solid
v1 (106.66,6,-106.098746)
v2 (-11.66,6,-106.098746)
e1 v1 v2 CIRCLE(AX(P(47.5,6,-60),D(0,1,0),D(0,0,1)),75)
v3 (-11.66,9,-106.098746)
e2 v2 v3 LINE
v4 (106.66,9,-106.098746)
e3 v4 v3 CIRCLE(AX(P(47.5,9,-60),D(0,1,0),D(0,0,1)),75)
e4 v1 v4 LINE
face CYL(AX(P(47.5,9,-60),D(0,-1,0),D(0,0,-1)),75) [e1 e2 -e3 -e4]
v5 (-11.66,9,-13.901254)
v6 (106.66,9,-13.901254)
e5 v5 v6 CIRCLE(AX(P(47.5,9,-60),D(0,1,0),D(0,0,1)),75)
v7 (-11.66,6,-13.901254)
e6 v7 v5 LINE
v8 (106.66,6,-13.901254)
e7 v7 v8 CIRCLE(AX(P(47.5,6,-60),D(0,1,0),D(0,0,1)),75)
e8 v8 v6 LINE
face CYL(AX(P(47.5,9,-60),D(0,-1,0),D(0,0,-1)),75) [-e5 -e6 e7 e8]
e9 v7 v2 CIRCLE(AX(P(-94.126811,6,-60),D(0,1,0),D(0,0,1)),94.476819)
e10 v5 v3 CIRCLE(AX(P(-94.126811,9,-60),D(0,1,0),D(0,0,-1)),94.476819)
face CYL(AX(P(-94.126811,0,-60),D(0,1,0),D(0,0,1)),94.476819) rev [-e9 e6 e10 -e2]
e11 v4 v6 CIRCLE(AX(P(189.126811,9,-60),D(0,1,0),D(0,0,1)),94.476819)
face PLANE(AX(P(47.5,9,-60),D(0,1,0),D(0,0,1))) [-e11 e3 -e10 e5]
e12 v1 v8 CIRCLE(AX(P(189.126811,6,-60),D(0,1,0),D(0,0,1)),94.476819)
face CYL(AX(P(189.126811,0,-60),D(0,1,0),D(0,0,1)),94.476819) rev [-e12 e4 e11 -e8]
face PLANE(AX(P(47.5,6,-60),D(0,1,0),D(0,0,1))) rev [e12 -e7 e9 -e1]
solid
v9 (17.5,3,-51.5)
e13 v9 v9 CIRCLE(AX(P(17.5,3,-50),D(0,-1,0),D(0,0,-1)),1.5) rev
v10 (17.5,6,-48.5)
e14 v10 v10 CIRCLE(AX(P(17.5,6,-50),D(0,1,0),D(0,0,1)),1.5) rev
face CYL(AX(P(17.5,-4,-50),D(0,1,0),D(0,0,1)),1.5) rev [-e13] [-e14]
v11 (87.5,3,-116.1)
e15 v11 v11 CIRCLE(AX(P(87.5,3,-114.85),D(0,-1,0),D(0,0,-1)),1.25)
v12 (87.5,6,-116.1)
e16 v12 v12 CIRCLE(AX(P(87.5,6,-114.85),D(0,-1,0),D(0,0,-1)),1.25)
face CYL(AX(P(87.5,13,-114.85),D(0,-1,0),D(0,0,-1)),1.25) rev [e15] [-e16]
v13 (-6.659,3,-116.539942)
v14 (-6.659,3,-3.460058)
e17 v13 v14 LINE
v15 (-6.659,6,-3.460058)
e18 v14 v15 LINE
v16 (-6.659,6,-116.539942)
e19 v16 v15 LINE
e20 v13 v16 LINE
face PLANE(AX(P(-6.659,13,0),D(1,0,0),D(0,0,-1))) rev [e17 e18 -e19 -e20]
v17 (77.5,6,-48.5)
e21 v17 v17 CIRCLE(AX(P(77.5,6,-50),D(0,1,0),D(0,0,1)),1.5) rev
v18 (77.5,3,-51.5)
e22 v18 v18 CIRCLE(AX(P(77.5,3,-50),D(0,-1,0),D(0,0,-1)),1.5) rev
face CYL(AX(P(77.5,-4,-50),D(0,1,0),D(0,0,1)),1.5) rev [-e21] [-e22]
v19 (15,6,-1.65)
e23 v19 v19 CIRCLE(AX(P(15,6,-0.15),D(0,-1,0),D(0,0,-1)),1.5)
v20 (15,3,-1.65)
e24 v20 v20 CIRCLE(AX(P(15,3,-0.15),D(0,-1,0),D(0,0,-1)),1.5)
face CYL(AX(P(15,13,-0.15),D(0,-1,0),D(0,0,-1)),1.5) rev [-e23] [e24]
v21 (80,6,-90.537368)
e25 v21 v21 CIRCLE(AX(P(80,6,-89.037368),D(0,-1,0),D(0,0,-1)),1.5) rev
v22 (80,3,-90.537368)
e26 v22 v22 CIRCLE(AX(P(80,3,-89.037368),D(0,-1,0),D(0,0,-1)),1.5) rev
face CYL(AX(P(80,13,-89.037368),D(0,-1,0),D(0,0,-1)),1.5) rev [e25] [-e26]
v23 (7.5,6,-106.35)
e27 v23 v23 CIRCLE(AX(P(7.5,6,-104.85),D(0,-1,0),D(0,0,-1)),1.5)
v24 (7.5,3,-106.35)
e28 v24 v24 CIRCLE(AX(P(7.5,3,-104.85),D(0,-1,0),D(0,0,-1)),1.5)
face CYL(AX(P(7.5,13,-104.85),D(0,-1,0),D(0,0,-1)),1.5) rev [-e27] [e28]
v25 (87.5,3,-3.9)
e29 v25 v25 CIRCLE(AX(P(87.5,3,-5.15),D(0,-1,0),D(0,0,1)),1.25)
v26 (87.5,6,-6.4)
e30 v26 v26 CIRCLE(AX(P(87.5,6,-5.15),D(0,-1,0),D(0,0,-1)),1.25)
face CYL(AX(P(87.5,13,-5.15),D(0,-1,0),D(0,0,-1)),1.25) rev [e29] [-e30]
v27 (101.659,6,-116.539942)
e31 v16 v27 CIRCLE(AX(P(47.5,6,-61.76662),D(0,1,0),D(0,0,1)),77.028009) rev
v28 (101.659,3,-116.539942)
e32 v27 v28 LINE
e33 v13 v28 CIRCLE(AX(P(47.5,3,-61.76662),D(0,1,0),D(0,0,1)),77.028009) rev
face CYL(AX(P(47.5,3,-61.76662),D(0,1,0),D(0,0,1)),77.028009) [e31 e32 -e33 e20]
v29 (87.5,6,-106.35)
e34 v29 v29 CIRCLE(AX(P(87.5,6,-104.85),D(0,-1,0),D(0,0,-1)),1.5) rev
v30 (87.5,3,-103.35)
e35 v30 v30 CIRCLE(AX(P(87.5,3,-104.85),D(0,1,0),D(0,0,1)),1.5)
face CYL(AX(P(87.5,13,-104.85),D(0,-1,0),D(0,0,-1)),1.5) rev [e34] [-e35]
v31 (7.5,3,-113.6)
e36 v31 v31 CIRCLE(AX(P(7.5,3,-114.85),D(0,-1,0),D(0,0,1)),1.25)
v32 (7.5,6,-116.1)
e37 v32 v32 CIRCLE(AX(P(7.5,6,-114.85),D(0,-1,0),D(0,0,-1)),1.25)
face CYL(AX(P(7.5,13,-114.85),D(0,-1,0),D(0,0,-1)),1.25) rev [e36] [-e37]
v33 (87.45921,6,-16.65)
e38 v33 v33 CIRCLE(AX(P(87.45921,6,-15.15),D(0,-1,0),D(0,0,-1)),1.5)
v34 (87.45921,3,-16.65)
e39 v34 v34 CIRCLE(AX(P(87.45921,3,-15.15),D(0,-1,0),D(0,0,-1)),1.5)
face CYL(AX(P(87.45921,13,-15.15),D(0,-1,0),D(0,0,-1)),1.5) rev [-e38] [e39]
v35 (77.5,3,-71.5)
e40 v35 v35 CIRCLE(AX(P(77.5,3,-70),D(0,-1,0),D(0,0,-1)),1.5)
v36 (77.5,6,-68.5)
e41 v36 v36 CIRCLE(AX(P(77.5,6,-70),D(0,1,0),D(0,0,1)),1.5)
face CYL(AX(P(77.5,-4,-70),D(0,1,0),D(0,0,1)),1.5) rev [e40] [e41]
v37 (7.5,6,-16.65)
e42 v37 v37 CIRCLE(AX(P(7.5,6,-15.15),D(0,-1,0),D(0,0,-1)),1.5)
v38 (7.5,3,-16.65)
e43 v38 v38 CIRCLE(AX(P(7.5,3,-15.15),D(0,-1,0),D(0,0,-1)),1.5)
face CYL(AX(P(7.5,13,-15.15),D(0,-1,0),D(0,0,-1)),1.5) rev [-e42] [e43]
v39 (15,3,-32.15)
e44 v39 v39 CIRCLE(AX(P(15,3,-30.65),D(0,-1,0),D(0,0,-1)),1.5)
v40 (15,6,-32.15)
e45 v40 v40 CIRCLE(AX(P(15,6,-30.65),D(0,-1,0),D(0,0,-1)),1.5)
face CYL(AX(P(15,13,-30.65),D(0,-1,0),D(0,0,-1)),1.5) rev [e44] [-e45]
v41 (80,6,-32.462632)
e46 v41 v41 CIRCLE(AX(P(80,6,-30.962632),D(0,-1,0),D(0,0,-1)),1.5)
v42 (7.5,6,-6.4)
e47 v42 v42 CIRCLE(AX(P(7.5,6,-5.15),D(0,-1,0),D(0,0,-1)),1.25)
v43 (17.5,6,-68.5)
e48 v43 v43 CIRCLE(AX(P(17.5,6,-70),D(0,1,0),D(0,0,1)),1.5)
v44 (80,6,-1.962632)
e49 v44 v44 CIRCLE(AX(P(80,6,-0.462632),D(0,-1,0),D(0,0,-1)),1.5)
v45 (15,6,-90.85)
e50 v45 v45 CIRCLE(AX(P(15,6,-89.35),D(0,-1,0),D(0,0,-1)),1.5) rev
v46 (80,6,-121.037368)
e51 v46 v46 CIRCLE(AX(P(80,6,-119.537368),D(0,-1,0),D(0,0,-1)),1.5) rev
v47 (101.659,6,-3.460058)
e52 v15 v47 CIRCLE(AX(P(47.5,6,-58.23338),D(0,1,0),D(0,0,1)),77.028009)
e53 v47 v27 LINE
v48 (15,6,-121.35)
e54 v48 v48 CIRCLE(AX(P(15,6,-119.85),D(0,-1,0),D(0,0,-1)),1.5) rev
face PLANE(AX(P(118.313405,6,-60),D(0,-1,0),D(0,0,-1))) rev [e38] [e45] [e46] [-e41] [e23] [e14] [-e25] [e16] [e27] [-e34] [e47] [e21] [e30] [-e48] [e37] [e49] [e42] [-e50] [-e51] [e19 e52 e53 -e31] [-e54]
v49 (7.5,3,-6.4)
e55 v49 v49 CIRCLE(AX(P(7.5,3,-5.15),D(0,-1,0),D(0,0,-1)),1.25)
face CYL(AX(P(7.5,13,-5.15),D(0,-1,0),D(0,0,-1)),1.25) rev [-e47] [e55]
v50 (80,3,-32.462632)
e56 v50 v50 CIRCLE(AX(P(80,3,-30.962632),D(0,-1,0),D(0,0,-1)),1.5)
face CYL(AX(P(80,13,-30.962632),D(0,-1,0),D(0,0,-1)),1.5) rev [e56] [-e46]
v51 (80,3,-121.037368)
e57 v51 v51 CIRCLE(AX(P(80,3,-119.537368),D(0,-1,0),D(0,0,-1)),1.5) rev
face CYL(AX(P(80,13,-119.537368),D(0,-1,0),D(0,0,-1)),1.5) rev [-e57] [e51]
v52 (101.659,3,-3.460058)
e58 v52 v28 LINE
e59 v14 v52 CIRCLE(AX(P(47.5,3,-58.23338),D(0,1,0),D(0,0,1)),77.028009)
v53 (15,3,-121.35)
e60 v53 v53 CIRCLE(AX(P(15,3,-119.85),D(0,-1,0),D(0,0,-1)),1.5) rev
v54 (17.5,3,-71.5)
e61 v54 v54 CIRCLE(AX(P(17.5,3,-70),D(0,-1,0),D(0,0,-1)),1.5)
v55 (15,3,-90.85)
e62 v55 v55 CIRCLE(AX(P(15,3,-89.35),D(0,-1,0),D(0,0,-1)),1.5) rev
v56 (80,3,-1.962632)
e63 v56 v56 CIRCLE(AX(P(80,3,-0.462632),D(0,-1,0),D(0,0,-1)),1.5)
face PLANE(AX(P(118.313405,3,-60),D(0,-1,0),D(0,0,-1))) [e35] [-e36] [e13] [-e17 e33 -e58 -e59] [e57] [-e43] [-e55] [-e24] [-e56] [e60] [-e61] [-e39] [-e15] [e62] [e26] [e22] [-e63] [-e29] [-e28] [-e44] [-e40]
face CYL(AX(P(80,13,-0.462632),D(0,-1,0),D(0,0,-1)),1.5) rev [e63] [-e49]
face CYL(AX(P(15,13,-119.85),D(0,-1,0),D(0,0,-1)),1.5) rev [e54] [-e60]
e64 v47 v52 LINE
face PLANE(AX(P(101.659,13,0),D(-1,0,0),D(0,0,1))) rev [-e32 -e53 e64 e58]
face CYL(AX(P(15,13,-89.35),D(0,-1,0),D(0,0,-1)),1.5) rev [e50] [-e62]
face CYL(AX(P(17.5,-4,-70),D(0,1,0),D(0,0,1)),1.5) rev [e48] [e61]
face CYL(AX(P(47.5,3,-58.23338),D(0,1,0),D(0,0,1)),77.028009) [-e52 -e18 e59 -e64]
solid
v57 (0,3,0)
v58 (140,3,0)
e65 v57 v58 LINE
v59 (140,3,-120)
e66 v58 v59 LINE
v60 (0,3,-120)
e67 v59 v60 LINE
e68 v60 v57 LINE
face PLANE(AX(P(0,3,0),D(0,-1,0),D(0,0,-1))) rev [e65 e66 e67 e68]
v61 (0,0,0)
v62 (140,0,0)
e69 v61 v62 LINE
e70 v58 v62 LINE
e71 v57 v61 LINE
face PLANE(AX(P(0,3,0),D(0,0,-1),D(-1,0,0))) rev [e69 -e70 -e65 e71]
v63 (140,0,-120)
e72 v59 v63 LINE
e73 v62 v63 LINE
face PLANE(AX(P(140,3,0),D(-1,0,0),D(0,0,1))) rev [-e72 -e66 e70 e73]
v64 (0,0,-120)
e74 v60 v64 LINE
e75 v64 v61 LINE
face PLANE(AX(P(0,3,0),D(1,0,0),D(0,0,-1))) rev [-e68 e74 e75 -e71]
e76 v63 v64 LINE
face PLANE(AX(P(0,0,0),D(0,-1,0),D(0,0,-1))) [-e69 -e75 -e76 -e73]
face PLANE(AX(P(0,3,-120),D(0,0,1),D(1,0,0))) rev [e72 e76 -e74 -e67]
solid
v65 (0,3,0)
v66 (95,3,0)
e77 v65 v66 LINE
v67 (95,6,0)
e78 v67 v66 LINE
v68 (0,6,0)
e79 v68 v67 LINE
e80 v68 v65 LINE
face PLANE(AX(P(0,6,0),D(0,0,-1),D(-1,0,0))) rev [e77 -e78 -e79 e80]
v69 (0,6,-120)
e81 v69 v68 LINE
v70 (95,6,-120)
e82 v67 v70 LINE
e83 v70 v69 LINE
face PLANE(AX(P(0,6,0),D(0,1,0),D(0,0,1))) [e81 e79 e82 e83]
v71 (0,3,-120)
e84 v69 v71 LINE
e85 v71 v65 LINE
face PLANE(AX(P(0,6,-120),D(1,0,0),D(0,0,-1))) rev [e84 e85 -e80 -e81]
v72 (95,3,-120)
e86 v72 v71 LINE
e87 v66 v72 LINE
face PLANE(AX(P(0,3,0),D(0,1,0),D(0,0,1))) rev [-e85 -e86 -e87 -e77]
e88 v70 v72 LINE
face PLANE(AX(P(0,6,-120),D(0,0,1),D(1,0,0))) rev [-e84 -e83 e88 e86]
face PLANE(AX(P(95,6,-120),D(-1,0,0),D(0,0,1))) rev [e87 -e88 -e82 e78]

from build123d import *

# Parameters (mm, degrees)
SKETCH1_W                   = 140
SKETCH1_H                   = 120
COMPACT_DEPTH               = 3
SKETCH4_W                   = 95
SKETCH4_H                   = 120
SUPERCOMPACT_DEPTH          = 3
SKETCH7_R                   = 75
APPLE_BASE_DEPTH            = 3
SIDECUTS_DEPTH              = 195.694632694
APPLE_BASE_2_DEPTH          = 3
BOSS_EXTRUDE4_DEPTH         = 3
BASE_PLATE_FILLET_R         = 0.001
TOP_BOTTOM_EXTENSIONS_DEPTH = 3
SKETCH35_R                  = 1.25
SPACERHOLES_DEPTH           = 10
CUT_EXTRUDE4_DEPTH          = 10
SKETCH39_R                  = 1.5
CUT_EXTRUDE5_DEPTH          = 10
CUT_EXTRUDE6_START          = -3
CUT_EXTRUDE6_OUTLINE_R      = 1.5
CUT_EXTRUDE6_DEPTH          = 3
SKETCH41_R                  = 1.5
CUT_EXTRUDE7_DEPTH          = 10
SKETCH45_R                  = 1.5
CUT_EXTRUDE8_DEPTH          = 10


# Read off the part's stored shape, not the designer's step: Cut-Extrude6
with BuildPart() as part:
    # Sketch1 → Compact (new body)
    with BuildSketch(Plane(origin=(0, 0, 0), x_dir=(1, 0, 0), z_dir=(0, 1, 0))):
        with Locations((70, 60)):
            Rectangle(SKETCH1_W, SKETCH1_H)
    extrude(amount=COMPACT_DEPTH)


with BuildPart() as body_2:
    # Sketch4 → SuperCompact (new body)
    with BuildSketch(Plane(origin=(0, 3, 0), x_dir=(1, 0, 0), z_dir=(0, 1, 0))):
        with Locations((47.5, 60)):
            Rectangle(SKETCH4_W, SKETCH4_H)
    extrude(amount=SUPERCOMPACT_DEPTH)


with BuildPart() as body_3:
    # Sketch7 → Apple Base (new body)
    with BuildSketch(Plane(origin=(0, 6, 0), x_dir=(1, 0, 0), z_dir=(0, 1, 0))):
        with Locations(Location((47.5, 60, 0), (0, 0, 270))):
            Circle(SKETCH7_R)
    extrude(amount=APPLE_BASE_DEPTH)

    # Sketch8 → SideCuts (cut, through all)
    with BuildSketch(Plane(origin=(0, 9, 0), x_dir=(1, 0, 0), z_dir=(0, 1, 0))):
        with BuildLine():
            ThreePointArc((-11.66, 106.098746187), (0.350007958, 60), (-11.66, 13.901253813))
            ThreePointArc((-11.66, 13.901253813), (-27.5, 60), (-11.66, 106.098746187))
        make_face()
        with BuildLine():
            ThreePointArc((106.66, 106.098746187), (94.649992042, 60), (106.66, 13.901253813))
            ThreePointArc((106.66, 13.901253813), (122.5, 60), (106.66, 106.098746187))
        make_face()
    extrude(amount=-SIDECUTS_DEPTH, mode=Mode.SUBTRACT)


with BuildPart() as body_4:
    # Sketch9 → Apple_Base 2 (new body)
    with BuildSketch(Plane.XZ.offset(-6)):
        with BuildLine():
            ThreePointArc((106.66, -13.901253813), (47.5, 15), (-11.66, -13.901253813))
            ThreePointArc((-11.66, -13.901253813), (0.350007958, -60), (-11.66, -106.098746187))
            ThreePointArc((-11.66, -106.098746187), (47.5, -135), (106.66, -106.098746187))
            ThreePointArc((106.66, -106.098746187), (94.649992042, -60), (106.66, -13.901253813))
        make_face()
    extrude(amount=APPLE_BASE_2_DEPTH)

    # Sketch10 → Boss-Extrude4 (add)
    with BuildSketch(Plane(origin=(0, 6, 0), x_dir=(1, 0, 0), z_dir=(0, 1, 0))):
        with BuildLine():
            Line((-11.66, 106.098746187), (-11.66, 13.901253813))
            ThreePointArc((-11.66, 13.901253813), (0.350007958, 60), (-11.66, 106.098746187))
        make_face()
        with BuildLine():
            Line((106.66, 106.098746187), (106.66, 13.901253813))
            ThreePointArc((106.66, 13.901253813), (94.649992042, 60), (106.66, 106.098746187))
        make_face()
    extrude(amount=-BOSS_EXTRUDE4_DEPTH)

    # Base_Plate_Fillet
    base_plate_fillet_edges = [body_4.edges().sort_by_distance(p)[0] for p in [
        (-11.66, 3, -60),
        (-11.66, 6, -60),
        (47.5, 3, -135),
        (106.66, 3, -60),
        (106.66, 6, -60),
        (47.5, 6, -135),
        (47.5, 6, 15),
        (106.66, 4.5, -106.098746187),
        (-11.66, 4.5, -106.098746187),
        (-11.66, 4.5, -13.901253813),
        (106.66, 4.5, -13.901253813),
        (47.5, 3, 15),
    ]]
    fillet(base_plate_fillet_edges, radius=BASE_PLATE_FILLET_R)

    # Sketch25 → Top Bottom extensions (add)
    with BuildSketch(Plane(origin=(0, 6, 0), x_dir=(1, 0, 0), z_dir=(0, 1, 0))):
        with BuildLine():
            Line((-11.659005821, 106.097402592), (-11.659005821, 111.097402592))
            ThreePointArc((-11.659005821, 111.097402592), (47.5, 138.794628322), (106.659005821, 111.097402592))
            Line((106.659005821, 111.097402592), (106.659005821, 106.097402592))
            ThreePointArc((106.659005821, 106.097402592), (47.5, 133.794628322), (-11.659005821, 106.097402592))
        make_face()
        with BuildLine():
            Line((106.659005821, 13.902597408), (106.659005821, 8.902597408))
            ThreePointArc((106.659005821, 8.902597408), (47.5, -18.794628322), (-11.659005821, 8.902597408))
            Line((-11.659005821, 8.902597408), (-11.659005821, 13.902597408))
            ThreePointArc((-11.659005821, 13.902597408), (47.5, -13.794628322), (106.659005821, 13.902597408))
        make_face()
    extrude(amount=-TOP_BOTTOM_EXTENSIONS_DEPTH)

    # Sketch35 → SpacerHoles (cut)
    with BuildSketch(Plane.XZ.offset(-3)):
        with Locations(Location((7.5, -5.15, 0), (0, 0, 270))):
            Circle(SKETCH35_R)
        with Locations(Location((87.5, -5.15, 0), (0, 0, 270))):
            Circle(SKETCH35_R)
        with Locations(Location((87.5, -114.85, 0), (0, 0, 270))):
            Circle(SKETCH35_R)
        with Locations(Location((7.5, -114.85, 0), (0, 0, 270))):
            Circle(SKETCH35_R)
    extrude(amount=-SPACERHOLES_DEPTH, mode=Mode.SUBTRACT)

    # Sketch38 → Cut-Extrude4 (cut)
    with BuildSketch(Plane.XZ.offset(-3)):
        Polygon((47.5, 37.050137759), (120.372278362, 37.050137759), (120.372278362, -158.601845129), (-29.177494987, -158.601845129), (-29.177494987, 37.050137759), align=None)
        Polygon((-6.659, -60), (-6.659, 24.702355976), (101.659, 24.702355976), (101.659, -143.843523469), (-6.659, -143.843523469), align=None, mode=Mode.SUBTRACT)
    extrude(amount=-CUT_EXTRUDE4_DEPTH, mode=Mode.SUBTRACT)

    # Sketch39 → Cut-Extrude5 (cut)
    with BuildSketch(Plane.XZ.offset(-3)):
        with Locations(Location((7.5, -104.85, 0), (0, 0, 270))):
            Circle(SKETCH39_R)
        with Locations(Location((87.5, -104.85, 0), (0, 0, 270))):
            Circle(SKETCH39_R)
    extrude(amount=-CUT_EXTRUDE5_DEPTH, mode=Mode.SUBTRACT)

    # Cut-Extrude6 outline → Cut-Extrude6 (cut)
    with BuildSketch(Plane.XZ.offset(-3).offset(CUT_EXTRUDE6_START)):
        with Locations((15, -0.15)):
            Circle(CUT_EXTRUDE6_OUTLINE_R)
        with Locations((15, -119.85)):
            Circle(CUT_EXTRUDE6_OUTLINE_R)
        with Locations((80, -119.537367713)):
            Circle(CUT_EXTRUDE6_OUTLINE_R)
        with Locations((80, -89.037367713)):
            Circle(CUT_EXTRUDE6_OUTLINE_R)
        with Locations((80, -0.462632287)):
            Circle(CUT_EXTRUDE6_OUTLINE_R)
        with Locations((15, -30.65)):
            Circle(CUT_EXTRUDE6_OUTLINE_R)
        with Locations((80, -30.962632287)):
            Circle(CUT_EXTRUDE6_OUTLINE_R)
        with Locations((15, -89.35)):
            Circle(CUT_EXTRUDE6_OUTLINE_R)
    extrude(amount=CUT_EXTRUDE6_DEPTH, mode=Mode.SUBTRACT)

    # Sketch41 → Cut-Extrude7 (cut)
    with BuildSketch(Plane.XZ.offset(-3)):
        with Locations(Location((7.5, -15.15, 0), (0, 0, 270))):
            Circle(SKETCH41_R)
        with Locations(Location((87.459210086, -15.15, 0), (0, 0, 270))):
            Circle(SKETCH41_R)
    extrude(amount=-CUT_EXTRUDE7_DEPTH, mode=Mode.SUBTRACT)

    # Sketch45 → Cut-Extrude8 (cut)
    with BuildSketch(Plane(origin=(0, 6, 0), x_dir=(1, 0, 0), z_dir=(0, 1, 0))):
        with Locations(Location((77.5, 70, 0), (0, 0, 270))):
            Circle(SKETCH45_R)
        with Locations(Location((17.5, 70, 0), (0, 0, 270))):
            Circle(SKETCH45_R)
        with Locations(Location((17.5, 50, 0), (0, 0, 270))):
            Circle(SKETCH45_R)
        with Locations(Location((77.5, 50, 0), (0, 0, 270))):
            Circle(SKETCH45_R)
    extrude(amount=-CUT_EXTRUDE8_DEPTH, mode=Mode.SUBTRACT)


solid = Compound([part.part, body_2.part, body_3.part, body_4.part])
